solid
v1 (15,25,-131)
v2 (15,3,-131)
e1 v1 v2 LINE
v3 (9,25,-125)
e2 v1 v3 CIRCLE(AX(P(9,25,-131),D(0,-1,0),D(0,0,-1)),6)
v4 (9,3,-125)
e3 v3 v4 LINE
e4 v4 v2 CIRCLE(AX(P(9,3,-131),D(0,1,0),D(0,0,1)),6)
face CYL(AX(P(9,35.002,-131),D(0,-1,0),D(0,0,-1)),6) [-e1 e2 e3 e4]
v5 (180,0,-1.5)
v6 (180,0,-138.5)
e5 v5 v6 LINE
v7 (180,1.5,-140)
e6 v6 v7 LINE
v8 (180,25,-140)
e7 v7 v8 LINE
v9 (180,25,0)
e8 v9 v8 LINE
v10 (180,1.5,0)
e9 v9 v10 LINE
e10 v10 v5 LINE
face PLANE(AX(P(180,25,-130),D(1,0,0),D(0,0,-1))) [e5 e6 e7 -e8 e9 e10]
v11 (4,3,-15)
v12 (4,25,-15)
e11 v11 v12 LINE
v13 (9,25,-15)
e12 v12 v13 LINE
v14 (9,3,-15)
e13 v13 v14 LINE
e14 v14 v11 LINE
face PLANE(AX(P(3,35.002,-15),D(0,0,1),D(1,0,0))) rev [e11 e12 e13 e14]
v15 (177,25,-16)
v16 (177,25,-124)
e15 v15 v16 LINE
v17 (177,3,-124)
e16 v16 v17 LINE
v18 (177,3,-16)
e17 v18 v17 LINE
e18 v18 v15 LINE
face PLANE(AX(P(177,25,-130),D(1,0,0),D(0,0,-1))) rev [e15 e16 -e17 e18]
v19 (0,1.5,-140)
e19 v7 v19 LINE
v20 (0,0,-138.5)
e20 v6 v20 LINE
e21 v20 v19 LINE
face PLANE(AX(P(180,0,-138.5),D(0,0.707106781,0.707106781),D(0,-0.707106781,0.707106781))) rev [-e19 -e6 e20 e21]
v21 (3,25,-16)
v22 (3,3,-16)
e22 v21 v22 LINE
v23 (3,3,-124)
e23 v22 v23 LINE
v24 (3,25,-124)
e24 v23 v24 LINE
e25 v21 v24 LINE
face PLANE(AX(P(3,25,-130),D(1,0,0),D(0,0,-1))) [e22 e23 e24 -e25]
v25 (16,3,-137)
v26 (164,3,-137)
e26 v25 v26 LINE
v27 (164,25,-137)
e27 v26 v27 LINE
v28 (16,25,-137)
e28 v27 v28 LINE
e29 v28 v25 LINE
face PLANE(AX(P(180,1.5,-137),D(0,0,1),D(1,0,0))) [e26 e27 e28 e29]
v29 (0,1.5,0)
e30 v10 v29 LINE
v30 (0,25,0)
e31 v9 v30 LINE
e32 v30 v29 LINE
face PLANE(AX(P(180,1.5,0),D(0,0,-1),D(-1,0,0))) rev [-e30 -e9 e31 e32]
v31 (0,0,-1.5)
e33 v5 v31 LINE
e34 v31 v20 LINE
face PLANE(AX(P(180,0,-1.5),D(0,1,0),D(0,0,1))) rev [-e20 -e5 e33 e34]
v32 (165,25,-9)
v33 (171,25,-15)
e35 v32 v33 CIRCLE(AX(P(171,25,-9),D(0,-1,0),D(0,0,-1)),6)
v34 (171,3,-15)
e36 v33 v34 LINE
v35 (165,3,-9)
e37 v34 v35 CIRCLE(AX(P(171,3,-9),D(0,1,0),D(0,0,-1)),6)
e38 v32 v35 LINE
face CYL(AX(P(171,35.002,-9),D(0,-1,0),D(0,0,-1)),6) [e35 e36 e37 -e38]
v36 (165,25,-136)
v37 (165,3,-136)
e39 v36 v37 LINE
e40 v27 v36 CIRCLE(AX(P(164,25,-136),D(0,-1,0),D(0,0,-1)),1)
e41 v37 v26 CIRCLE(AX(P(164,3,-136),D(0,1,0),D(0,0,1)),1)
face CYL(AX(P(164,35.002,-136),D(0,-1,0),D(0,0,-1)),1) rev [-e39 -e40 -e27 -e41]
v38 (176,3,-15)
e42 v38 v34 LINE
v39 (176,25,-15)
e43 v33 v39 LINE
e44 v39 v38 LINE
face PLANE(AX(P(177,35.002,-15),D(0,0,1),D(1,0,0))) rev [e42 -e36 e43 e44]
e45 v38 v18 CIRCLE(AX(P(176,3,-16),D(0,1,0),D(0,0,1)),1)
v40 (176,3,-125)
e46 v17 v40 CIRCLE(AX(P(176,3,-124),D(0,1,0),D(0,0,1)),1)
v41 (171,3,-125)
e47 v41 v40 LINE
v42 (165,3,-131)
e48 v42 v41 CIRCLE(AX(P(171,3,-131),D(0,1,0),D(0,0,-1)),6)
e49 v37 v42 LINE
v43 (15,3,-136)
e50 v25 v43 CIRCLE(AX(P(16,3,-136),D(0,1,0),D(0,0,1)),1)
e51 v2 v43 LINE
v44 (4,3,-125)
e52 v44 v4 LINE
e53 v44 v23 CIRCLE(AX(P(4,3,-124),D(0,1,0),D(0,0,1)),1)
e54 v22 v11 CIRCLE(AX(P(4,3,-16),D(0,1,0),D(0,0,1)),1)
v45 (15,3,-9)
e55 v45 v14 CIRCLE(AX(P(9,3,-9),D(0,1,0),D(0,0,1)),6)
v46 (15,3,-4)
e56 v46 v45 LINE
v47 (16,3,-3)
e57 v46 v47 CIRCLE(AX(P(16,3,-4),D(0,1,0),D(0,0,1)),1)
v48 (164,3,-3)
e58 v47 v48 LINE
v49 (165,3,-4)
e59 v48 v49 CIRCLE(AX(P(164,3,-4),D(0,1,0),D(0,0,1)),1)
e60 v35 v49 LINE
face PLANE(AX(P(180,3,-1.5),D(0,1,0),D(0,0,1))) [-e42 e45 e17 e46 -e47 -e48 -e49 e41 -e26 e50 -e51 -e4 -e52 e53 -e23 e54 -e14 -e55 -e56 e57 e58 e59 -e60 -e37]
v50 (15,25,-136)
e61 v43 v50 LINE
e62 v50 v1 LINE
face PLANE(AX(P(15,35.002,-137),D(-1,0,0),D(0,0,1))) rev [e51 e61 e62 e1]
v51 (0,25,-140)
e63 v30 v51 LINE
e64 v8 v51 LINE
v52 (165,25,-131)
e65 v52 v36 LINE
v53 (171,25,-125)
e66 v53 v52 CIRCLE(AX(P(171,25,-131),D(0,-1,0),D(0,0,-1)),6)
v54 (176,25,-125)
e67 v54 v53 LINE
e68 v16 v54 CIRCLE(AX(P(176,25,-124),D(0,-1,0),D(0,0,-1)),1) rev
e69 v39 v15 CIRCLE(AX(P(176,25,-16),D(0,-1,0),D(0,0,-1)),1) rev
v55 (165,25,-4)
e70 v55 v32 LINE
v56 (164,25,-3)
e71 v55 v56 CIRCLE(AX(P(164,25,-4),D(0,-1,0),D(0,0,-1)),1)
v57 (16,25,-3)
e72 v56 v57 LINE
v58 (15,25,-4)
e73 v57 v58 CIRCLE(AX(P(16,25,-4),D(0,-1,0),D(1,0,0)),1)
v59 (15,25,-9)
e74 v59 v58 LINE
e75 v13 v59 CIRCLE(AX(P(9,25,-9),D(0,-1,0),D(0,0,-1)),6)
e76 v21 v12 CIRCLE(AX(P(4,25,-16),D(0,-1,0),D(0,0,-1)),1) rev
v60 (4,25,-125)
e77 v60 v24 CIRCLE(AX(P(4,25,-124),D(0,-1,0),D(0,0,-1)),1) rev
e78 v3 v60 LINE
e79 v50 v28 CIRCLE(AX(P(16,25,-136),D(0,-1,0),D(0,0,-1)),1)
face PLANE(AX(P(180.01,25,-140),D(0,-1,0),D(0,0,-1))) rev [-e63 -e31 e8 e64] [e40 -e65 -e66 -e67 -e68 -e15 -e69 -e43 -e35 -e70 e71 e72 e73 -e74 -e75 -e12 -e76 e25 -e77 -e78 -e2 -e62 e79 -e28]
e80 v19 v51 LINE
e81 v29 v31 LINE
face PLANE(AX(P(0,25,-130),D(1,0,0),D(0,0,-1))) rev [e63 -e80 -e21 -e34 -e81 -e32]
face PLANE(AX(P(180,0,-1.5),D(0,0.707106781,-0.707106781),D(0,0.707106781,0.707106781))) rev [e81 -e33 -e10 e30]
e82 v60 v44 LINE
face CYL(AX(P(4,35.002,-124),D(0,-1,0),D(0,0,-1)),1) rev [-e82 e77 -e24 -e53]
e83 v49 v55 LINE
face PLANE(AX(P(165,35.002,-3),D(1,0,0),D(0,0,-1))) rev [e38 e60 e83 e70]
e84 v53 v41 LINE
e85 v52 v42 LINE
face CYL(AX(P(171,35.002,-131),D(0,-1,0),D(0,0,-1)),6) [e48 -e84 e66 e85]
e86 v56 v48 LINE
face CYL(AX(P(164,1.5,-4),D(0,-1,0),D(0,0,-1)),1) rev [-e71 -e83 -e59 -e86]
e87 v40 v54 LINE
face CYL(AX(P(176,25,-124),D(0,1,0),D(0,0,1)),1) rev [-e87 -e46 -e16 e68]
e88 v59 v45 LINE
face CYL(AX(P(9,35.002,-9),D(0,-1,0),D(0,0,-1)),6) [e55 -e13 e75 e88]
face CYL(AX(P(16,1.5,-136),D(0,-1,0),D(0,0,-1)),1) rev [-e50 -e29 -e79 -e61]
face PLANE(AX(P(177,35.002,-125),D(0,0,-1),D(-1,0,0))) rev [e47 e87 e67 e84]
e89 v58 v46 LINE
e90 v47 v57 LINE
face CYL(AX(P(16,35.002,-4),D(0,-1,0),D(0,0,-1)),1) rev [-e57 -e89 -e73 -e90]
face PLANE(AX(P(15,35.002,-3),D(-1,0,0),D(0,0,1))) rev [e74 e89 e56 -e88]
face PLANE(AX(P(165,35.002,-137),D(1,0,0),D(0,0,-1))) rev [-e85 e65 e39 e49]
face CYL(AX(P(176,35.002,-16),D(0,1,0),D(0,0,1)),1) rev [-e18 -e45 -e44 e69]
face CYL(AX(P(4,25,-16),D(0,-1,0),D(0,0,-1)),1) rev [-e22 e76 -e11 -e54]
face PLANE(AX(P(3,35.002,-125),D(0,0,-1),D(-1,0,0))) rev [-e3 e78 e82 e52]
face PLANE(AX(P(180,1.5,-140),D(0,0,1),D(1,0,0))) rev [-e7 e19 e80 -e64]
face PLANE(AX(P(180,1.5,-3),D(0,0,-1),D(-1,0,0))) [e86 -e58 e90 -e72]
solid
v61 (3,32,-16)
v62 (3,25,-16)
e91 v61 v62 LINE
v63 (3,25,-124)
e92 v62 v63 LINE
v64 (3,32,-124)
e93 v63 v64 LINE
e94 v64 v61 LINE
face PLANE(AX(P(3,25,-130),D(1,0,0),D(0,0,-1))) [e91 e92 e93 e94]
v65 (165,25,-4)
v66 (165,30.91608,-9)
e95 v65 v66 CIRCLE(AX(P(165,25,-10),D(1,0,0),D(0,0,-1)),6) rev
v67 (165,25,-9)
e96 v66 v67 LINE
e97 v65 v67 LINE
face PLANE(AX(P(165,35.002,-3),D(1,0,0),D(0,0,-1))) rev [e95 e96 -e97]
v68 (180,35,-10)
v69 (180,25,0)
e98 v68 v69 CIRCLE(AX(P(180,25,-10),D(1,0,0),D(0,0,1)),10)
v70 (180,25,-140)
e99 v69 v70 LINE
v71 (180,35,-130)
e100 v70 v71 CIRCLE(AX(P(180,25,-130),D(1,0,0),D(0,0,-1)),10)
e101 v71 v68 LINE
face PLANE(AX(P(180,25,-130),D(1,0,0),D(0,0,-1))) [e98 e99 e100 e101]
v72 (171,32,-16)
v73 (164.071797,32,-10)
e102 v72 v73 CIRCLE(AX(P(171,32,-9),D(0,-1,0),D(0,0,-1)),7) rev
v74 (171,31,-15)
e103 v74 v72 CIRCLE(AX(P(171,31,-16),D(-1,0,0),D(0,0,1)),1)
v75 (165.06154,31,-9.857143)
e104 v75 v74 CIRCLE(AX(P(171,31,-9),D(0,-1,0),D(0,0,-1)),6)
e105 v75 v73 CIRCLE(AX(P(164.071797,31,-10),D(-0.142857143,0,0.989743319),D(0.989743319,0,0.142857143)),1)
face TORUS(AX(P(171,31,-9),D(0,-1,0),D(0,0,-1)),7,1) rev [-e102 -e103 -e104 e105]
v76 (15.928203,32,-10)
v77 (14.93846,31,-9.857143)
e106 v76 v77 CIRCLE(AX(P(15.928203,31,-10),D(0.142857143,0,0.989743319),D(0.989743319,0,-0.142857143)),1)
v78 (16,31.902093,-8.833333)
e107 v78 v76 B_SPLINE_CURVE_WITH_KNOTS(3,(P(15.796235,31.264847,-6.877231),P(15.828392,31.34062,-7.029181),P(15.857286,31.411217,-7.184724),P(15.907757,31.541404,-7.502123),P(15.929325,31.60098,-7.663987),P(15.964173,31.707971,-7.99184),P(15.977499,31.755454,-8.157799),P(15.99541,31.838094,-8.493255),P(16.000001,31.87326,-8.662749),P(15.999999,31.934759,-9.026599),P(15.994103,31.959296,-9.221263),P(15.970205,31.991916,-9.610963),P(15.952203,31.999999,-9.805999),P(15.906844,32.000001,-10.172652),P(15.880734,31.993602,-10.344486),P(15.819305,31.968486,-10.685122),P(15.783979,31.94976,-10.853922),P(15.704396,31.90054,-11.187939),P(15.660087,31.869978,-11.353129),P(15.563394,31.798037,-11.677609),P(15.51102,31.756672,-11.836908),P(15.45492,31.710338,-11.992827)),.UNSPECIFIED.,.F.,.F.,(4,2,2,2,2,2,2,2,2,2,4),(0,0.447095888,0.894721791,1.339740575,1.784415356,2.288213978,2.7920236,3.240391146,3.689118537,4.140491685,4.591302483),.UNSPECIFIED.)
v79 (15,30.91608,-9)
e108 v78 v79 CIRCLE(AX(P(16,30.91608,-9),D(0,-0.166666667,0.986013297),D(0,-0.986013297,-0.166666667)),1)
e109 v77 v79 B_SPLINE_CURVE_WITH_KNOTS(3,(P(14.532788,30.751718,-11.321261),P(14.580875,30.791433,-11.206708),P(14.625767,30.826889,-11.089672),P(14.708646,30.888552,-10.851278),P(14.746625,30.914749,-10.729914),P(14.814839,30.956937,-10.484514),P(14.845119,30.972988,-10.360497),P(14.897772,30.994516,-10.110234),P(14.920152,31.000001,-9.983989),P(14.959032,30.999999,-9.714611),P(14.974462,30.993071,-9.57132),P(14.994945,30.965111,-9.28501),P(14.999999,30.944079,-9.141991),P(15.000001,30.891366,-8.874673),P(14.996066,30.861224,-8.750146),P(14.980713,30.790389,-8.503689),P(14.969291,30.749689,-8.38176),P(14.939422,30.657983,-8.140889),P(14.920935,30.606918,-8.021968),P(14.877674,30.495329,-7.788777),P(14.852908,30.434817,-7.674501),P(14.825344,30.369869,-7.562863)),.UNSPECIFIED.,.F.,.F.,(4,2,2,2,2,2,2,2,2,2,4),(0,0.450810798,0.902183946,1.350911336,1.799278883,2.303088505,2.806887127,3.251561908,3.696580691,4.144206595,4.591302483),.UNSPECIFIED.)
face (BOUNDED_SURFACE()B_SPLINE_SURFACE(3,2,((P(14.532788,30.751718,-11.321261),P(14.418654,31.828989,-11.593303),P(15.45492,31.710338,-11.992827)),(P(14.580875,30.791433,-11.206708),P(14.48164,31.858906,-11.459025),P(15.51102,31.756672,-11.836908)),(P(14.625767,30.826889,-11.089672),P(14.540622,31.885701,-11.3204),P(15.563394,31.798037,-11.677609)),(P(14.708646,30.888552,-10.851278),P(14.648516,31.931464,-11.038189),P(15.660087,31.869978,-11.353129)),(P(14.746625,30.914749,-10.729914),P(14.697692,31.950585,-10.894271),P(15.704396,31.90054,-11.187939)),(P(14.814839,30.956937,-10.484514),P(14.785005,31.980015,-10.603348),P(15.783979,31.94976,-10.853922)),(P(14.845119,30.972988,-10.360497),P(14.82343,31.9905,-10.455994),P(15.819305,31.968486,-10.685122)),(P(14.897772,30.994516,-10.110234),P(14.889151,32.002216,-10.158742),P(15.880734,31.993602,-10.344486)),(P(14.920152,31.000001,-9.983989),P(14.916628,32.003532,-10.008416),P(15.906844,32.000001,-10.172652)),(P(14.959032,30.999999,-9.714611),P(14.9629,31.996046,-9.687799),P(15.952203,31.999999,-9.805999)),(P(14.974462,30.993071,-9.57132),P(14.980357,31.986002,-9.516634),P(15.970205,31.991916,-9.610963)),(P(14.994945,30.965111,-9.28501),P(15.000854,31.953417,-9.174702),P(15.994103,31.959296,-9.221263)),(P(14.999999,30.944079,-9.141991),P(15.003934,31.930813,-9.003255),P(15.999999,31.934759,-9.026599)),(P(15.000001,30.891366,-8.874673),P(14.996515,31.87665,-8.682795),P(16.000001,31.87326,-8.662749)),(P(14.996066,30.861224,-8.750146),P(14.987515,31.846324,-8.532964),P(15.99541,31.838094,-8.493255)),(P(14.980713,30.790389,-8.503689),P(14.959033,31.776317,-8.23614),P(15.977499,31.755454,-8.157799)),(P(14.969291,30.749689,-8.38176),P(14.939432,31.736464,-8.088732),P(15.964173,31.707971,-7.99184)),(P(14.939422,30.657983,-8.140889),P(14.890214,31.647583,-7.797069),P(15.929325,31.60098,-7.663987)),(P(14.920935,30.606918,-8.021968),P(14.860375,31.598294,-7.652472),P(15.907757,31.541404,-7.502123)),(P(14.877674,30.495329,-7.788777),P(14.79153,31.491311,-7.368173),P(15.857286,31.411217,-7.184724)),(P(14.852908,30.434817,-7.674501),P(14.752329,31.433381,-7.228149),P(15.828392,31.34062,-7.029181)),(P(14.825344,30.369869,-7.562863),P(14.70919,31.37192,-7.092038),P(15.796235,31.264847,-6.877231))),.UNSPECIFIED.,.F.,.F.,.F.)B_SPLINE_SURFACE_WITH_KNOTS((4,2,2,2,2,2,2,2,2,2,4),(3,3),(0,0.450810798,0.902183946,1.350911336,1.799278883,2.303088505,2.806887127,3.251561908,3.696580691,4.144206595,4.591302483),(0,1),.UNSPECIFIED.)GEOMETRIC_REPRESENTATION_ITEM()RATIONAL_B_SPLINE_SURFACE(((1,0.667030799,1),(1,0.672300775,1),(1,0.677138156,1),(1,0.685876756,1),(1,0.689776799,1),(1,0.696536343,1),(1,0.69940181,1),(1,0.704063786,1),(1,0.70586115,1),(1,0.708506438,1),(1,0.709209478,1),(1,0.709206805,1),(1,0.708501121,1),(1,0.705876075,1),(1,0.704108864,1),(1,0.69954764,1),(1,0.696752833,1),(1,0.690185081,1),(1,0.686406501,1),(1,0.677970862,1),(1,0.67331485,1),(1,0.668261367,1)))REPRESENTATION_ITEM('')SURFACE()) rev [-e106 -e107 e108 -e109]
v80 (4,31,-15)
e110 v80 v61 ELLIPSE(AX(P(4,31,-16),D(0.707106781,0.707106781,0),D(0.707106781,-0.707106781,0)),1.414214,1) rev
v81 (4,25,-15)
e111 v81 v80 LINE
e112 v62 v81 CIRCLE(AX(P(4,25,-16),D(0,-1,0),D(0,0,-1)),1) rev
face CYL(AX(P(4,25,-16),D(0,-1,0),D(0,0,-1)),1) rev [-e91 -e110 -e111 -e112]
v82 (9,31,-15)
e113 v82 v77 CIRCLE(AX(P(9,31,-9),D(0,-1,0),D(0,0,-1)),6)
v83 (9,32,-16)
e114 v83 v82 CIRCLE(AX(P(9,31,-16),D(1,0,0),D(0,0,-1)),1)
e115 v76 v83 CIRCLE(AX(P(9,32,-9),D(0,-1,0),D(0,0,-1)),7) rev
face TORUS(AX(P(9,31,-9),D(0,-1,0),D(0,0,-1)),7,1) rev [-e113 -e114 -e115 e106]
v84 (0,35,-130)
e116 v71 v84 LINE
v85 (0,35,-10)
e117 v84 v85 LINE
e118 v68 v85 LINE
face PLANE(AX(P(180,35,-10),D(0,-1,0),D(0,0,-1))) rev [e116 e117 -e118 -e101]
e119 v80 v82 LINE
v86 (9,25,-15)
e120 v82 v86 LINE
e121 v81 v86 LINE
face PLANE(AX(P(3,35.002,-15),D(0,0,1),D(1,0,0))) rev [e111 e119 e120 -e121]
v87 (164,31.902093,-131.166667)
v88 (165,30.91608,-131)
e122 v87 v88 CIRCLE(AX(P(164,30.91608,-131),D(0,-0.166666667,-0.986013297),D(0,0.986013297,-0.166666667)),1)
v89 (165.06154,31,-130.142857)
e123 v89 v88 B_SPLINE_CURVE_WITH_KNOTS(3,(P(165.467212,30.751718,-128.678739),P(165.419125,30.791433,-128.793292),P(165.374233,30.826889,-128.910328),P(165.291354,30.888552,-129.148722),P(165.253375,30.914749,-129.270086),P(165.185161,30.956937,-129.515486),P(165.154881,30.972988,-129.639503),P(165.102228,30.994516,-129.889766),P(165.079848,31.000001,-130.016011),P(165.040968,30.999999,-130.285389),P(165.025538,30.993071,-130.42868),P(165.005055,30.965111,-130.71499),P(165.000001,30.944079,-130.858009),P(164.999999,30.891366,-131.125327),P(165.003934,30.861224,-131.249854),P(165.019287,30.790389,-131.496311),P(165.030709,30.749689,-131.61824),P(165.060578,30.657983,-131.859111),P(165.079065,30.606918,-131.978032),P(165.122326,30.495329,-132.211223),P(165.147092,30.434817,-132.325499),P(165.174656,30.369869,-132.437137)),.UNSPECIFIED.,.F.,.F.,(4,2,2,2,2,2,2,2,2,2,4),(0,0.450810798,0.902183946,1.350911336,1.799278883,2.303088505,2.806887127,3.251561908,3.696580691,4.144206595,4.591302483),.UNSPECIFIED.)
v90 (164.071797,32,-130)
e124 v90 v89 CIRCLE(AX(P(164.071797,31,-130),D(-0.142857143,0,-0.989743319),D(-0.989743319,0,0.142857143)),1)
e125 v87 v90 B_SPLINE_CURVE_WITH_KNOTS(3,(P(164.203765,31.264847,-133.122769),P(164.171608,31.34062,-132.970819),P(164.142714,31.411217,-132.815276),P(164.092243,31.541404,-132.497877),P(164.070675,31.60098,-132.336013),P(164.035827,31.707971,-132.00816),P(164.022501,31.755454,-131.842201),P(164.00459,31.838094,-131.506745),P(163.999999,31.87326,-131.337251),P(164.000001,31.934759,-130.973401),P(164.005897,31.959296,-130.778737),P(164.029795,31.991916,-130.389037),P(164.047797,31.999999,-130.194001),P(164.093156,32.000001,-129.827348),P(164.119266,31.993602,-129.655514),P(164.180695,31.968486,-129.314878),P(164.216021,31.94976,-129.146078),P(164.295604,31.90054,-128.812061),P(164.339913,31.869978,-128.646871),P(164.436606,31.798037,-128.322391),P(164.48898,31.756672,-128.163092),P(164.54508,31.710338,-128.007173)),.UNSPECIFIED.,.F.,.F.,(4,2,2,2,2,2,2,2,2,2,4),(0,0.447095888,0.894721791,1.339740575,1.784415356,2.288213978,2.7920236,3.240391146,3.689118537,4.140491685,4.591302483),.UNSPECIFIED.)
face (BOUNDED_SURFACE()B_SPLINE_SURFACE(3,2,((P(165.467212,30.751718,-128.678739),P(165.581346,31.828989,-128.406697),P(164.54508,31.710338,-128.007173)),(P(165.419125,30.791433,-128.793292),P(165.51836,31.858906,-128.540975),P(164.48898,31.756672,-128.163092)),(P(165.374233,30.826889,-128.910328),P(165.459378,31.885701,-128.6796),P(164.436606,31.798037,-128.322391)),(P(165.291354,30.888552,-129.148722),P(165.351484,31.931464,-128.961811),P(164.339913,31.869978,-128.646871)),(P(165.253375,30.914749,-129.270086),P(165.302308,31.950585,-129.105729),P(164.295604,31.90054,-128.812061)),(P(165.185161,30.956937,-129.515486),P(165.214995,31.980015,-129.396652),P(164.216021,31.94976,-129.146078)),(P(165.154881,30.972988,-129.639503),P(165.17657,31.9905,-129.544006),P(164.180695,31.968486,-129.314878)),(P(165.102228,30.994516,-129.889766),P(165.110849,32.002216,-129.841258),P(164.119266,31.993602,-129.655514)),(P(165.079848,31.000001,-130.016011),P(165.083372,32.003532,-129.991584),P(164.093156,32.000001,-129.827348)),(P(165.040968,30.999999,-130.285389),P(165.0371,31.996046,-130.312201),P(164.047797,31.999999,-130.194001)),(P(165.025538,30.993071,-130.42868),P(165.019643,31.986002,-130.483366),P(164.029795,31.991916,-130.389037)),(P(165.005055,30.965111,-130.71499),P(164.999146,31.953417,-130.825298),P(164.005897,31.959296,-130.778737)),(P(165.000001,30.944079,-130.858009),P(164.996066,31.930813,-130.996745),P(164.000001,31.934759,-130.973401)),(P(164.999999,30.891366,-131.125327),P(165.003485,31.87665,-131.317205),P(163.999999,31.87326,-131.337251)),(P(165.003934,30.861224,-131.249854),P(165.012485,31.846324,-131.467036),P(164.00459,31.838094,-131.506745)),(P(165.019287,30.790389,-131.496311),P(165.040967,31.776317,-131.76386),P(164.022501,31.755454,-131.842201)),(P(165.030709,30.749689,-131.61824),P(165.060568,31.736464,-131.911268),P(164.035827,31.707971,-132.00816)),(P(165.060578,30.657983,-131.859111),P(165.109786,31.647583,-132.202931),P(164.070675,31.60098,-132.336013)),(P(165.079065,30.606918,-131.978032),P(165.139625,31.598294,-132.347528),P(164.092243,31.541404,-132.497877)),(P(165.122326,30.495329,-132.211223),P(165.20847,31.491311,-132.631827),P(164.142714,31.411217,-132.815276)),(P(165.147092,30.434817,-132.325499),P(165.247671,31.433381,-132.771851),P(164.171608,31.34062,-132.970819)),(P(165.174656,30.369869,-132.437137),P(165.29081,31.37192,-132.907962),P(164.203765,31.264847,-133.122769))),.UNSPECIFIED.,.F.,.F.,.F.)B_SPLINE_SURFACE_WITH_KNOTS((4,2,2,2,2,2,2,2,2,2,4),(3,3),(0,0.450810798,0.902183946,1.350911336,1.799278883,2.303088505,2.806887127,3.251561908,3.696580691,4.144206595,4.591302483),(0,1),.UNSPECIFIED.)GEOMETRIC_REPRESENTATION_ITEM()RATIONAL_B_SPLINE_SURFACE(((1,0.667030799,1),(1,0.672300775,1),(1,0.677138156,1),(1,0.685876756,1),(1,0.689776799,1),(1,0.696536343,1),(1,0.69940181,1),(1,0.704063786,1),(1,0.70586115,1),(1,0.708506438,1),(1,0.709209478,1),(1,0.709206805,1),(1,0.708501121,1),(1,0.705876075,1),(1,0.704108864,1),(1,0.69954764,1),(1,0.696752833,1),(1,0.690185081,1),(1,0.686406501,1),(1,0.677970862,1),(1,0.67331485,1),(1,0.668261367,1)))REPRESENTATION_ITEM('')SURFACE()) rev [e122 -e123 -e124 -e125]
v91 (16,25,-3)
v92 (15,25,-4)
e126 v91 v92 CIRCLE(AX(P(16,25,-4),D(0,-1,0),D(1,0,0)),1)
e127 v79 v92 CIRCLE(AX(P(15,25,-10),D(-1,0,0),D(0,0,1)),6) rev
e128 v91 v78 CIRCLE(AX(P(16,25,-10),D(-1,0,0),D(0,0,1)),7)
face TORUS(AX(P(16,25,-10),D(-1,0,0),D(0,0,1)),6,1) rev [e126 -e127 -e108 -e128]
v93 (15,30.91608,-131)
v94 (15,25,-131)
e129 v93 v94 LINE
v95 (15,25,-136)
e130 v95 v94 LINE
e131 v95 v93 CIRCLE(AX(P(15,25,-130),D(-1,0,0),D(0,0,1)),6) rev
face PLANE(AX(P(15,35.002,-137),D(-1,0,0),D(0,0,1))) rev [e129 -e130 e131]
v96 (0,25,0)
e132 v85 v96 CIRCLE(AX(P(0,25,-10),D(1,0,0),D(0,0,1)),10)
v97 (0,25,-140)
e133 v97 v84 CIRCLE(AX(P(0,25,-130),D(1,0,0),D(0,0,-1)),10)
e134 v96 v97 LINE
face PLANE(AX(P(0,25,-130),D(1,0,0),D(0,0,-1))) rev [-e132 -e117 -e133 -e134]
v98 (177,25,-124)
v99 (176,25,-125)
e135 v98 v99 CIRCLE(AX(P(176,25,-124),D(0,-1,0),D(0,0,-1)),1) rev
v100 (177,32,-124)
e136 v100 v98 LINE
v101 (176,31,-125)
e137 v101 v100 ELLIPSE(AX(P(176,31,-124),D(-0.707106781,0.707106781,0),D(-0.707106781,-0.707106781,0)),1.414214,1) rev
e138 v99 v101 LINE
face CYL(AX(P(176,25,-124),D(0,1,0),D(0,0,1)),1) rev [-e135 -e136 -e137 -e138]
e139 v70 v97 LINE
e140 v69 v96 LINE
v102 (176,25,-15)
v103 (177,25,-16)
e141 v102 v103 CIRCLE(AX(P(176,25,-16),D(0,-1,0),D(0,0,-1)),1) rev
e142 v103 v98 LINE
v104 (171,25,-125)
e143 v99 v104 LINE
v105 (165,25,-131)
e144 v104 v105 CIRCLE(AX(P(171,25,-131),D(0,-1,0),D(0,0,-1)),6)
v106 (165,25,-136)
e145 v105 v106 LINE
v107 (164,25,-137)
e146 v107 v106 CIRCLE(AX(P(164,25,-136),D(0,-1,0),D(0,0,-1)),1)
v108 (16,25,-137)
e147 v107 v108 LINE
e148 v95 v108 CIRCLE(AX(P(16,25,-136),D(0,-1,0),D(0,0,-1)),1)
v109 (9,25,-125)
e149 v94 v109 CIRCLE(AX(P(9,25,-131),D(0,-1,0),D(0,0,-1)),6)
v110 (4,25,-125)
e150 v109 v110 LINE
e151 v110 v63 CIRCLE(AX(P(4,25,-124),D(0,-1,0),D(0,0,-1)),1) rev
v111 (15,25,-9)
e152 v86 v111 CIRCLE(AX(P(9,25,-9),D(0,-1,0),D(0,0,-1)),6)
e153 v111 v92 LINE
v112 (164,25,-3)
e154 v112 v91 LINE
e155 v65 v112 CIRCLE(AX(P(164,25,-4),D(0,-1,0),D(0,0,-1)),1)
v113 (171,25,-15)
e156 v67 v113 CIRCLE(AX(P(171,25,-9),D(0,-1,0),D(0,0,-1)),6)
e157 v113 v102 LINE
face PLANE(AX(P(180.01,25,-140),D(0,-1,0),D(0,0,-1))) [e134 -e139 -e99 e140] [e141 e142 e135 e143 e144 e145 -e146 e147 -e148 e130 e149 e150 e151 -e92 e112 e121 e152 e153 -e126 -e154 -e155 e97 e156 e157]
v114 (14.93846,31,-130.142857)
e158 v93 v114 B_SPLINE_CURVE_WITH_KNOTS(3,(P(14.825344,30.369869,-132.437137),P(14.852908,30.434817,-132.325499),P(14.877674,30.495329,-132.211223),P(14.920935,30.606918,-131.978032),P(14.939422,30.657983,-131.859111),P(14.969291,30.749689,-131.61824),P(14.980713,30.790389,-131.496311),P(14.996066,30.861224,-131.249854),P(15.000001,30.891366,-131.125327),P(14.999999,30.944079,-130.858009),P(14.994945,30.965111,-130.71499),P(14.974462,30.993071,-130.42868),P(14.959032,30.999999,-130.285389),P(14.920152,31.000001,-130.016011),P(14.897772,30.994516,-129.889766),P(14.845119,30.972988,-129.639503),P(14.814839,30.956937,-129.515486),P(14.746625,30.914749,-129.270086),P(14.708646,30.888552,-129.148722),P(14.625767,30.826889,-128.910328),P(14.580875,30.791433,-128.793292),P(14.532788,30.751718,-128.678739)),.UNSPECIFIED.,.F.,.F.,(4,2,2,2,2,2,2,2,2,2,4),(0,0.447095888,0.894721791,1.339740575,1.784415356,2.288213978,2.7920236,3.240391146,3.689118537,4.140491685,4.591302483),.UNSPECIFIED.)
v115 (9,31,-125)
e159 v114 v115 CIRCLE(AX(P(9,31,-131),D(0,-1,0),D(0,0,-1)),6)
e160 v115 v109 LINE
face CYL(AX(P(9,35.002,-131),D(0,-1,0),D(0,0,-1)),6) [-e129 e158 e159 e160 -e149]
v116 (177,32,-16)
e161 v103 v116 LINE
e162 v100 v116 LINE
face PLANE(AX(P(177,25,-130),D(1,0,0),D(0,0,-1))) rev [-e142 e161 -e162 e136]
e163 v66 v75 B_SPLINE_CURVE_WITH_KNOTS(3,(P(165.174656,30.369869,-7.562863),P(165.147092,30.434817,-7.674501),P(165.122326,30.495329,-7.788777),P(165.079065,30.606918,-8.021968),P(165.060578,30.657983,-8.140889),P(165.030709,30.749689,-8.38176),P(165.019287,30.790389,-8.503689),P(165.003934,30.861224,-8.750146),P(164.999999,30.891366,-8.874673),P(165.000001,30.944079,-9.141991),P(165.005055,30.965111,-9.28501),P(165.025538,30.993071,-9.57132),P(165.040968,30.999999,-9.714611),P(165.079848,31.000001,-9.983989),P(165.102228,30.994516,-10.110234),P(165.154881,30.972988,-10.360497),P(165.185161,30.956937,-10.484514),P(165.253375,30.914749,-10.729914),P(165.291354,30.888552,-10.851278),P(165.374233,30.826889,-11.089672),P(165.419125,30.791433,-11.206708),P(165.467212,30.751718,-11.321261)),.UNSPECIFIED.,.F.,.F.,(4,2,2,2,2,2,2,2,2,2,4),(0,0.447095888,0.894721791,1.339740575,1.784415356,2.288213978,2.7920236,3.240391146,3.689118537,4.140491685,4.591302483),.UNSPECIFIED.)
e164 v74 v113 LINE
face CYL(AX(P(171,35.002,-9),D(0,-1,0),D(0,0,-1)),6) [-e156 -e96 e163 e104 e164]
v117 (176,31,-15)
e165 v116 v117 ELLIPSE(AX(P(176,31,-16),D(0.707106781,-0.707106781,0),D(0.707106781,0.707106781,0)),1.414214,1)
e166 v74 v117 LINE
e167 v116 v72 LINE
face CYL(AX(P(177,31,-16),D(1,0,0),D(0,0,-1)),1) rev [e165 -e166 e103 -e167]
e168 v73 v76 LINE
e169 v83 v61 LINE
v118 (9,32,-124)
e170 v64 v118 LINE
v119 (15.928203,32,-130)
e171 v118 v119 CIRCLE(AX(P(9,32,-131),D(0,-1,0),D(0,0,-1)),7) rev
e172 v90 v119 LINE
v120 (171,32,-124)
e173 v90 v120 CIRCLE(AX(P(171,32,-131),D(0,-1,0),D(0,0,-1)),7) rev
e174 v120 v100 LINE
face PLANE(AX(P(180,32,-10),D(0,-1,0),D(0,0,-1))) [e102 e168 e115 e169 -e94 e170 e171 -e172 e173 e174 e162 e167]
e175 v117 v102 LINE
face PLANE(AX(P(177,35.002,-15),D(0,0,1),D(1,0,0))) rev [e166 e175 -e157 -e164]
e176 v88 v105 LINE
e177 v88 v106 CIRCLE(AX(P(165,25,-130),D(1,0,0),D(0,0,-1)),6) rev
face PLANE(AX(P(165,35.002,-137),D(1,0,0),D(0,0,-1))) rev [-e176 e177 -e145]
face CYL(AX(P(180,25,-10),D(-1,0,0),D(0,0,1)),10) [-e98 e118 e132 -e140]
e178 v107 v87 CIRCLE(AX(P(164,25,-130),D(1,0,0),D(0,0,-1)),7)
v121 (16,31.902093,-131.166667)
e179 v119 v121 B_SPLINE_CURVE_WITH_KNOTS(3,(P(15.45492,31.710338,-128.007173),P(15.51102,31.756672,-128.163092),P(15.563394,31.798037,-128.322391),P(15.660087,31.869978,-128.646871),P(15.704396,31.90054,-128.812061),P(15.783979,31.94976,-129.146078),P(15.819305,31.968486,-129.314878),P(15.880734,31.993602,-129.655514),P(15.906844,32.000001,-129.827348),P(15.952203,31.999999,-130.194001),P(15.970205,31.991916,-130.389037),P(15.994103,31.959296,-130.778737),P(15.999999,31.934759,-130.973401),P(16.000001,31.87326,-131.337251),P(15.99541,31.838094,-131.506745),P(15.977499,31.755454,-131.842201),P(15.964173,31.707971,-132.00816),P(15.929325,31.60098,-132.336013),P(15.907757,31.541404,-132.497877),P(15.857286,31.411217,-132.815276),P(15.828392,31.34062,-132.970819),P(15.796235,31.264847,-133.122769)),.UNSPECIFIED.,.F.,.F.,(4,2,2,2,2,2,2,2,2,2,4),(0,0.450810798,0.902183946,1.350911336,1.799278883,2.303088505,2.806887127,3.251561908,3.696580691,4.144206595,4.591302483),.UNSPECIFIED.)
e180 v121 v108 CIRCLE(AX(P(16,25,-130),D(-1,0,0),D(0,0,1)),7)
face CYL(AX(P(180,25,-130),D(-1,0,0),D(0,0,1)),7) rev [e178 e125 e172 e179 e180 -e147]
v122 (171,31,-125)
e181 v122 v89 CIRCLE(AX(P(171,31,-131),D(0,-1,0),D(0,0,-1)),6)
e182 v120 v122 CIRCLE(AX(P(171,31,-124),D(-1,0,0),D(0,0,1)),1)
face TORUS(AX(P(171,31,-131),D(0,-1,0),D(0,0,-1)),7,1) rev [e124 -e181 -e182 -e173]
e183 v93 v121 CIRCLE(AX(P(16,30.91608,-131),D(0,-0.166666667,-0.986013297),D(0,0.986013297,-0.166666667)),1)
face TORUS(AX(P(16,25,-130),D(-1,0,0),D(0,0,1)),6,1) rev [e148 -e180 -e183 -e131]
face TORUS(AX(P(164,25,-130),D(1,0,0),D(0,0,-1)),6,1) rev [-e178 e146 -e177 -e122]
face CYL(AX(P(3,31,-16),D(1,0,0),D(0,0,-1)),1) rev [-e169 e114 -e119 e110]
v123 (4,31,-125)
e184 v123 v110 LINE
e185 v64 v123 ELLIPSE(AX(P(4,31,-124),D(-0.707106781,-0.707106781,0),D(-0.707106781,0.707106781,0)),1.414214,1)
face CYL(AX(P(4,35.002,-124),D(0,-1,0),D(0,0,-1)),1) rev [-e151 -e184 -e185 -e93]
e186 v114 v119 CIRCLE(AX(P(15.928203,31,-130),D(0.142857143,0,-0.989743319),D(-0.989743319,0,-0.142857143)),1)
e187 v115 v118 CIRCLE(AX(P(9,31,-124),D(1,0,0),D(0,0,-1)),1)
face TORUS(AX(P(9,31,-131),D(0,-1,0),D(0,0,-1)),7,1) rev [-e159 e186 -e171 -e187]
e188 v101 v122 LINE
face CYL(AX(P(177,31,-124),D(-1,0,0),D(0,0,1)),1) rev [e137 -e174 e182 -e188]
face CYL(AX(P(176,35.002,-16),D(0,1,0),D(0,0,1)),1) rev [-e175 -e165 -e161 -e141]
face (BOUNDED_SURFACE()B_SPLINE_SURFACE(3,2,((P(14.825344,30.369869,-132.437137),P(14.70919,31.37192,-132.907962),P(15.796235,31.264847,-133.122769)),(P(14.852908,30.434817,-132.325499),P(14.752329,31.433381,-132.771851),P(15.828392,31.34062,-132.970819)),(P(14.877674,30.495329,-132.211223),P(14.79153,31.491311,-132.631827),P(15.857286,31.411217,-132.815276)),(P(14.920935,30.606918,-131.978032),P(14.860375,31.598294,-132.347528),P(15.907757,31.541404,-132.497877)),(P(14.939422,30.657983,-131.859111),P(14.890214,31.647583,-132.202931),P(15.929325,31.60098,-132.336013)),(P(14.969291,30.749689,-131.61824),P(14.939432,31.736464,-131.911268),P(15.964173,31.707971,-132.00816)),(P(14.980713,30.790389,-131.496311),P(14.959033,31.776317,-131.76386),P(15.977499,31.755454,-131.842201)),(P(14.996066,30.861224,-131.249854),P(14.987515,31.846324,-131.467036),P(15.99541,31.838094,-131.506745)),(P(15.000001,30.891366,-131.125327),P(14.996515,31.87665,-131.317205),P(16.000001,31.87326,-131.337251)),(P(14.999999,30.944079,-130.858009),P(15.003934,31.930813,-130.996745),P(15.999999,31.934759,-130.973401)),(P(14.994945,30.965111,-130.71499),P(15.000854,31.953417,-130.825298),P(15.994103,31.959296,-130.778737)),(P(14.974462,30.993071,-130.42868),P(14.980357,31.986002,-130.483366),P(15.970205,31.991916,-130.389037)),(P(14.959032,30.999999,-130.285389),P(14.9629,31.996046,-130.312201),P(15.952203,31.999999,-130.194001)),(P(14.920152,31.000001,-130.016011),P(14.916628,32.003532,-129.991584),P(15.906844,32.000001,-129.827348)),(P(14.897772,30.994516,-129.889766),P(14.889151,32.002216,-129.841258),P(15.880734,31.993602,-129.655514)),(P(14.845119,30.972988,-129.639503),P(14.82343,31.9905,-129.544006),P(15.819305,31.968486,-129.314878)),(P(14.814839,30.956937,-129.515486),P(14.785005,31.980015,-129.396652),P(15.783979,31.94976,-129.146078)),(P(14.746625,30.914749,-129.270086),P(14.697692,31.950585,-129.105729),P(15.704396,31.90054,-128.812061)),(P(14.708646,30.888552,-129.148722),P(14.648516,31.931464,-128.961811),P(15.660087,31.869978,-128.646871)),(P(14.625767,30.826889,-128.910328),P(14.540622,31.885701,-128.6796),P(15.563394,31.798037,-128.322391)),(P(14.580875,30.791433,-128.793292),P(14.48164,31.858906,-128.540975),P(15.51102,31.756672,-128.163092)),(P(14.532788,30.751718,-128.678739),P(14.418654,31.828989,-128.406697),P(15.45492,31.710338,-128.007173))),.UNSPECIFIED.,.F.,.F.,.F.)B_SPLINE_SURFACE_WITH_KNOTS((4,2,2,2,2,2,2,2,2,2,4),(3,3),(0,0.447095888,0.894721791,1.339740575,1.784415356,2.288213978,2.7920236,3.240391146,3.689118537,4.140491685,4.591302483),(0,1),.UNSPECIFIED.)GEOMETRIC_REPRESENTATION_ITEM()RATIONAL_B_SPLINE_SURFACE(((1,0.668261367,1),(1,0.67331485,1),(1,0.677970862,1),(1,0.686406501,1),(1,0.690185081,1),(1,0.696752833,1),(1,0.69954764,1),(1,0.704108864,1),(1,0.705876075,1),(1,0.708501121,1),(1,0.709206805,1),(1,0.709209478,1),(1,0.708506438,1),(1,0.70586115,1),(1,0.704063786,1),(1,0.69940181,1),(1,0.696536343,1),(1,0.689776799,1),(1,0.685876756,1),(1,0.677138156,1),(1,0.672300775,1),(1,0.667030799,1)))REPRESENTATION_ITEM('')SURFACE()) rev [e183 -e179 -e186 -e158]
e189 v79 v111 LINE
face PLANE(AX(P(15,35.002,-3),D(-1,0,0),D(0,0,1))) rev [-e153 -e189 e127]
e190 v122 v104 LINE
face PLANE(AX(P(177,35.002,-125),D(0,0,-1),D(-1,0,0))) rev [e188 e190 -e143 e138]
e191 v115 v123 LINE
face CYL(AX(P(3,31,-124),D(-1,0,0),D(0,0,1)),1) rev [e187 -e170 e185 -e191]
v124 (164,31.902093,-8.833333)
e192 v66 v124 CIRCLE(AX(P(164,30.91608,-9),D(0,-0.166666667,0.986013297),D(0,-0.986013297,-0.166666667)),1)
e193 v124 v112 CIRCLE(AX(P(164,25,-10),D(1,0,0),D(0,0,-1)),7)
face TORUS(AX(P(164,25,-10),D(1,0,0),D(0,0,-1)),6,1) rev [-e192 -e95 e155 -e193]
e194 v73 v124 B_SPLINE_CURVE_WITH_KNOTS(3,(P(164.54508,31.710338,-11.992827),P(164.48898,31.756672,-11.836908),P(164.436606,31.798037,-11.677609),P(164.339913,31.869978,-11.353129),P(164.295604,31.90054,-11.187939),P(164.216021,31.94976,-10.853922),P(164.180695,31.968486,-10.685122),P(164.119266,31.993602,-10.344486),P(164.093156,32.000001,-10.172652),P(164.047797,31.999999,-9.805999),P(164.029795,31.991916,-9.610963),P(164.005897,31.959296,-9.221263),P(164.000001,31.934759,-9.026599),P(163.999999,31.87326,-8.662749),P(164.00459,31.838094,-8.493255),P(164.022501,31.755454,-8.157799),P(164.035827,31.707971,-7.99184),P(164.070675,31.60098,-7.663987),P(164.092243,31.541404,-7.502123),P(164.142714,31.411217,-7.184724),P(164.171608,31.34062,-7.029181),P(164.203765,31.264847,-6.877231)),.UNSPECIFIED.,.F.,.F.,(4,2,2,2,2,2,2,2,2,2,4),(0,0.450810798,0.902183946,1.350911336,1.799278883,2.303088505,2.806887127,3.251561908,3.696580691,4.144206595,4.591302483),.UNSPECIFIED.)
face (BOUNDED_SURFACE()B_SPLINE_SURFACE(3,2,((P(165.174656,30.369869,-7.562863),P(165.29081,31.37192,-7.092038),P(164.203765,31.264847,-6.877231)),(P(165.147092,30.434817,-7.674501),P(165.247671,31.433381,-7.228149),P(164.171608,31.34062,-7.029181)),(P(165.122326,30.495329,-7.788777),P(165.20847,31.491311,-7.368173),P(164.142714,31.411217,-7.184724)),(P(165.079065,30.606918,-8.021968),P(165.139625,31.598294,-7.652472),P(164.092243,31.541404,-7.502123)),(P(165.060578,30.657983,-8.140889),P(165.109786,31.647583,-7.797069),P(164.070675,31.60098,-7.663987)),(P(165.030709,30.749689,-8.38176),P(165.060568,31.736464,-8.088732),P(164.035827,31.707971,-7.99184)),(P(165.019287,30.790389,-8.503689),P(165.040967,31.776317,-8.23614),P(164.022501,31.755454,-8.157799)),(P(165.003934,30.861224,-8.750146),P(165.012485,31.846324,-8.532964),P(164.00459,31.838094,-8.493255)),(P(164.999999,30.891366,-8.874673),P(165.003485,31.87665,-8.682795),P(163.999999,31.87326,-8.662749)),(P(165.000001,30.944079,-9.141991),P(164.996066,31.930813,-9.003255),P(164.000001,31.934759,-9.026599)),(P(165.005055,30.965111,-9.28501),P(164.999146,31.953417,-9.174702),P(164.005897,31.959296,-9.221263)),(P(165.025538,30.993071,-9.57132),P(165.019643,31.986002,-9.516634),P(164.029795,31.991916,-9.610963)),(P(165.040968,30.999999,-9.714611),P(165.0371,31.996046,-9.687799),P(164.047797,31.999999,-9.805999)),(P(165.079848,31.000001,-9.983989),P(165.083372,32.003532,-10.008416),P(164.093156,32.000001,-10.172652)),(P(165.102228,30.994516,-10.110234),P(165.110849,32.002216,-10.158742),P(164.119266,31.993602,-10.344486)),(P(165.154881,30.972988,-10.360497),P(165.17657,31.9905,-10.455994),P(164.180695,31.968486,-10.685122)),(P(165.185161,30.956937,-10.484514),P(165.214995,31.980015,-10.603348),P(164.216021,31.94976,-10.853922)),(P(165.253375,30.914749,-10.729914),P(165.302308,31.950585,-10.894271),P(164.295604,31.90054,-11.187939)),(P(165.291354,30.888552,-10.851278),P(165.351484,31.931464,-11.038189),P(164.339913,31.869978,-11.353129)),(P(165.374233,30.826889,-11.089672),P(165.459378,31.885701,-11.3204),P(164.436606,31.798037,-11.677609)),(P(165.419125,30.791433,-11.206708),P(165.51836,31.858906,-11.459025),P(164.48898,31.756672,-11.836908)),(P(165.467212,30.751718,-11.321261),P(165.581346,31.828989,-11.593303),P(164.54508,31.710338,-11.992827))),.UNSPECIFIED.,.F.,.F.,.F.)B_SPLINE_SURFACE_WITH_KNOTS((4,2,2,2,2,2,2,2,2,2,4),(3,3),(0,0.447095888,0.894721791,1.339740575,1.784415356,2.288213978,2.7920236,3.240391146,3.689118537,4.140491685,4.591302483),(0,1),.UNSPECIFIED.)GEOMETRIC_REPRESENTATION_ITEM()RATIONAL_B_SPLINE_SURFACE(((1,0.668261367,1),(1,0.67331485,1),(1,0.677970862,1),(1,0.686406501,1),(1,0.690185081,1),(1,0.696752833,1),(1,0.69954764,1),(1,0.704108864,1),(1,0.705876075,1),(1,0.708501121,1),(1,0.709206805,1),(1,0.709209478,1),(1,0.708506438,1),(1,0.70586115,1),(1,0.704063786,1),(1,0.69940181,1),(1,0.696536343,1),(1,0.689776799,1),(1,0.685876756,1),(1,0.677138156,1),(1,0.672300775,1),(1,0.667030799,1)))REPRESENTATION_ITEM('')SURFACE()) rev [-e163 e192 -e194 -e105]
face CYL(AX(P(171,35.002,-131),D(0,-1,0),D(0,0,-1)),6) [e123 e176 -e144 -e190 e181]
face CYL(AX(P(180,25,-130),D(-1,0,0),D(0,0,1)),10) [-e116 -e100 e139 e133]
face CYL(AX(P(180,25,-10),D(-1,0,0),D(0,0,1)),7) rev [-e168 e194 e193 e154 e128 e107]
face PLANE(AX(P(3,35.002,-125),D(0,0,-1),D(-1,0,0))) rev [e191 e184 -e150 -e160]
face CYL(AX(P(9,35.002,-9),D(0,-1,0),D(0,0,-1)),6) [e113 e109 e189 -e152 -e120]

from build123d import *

# Parameters (mm, degrees)
CASEEXTRUDE_DEPTH      = 180
SHELL1_T               = 3
SCREWBOSSEXTRUDE_REACH = 232.269
INTERNALFILLET_R       = 1


# Read off the part's stored shape, not the designer's step: Split3
with BuildPart() as part:
    # Sketch1 → CaseExtrude (new body)
    with BuildSketch(Plane(origin=(0, 0, 0), x_dir=(0, 0, -1), z_dir=(1, 0, 0))):
        with BuildLine():
            Line((1.5, 0), (0, 1.5))
            Line((0, 1.5), (0, 25))
            ThreePointArc((0, 25), (2.928932188, 32.071067812), (10, 35))
            Line((10, 35), (130, 35))
            ThreePointArc((130, 35), (137.071067812, 32.071067812), (140, 25))
            Line((140, 25), (140, 1.5))
            Line((140, 1.5), (138.5, 0))
            Line((138.5, 0), (1.5, 0))
        make_face()
    extrude(amount=CASEEXTRUDE_DEPTH)

    # Shell1 (no face opened: a closed hollow body)
    add(offset(amount=-SHELL1_T, mode=Mode.PRIVATE), mode=Mode.SUBTRACT)

    # Sketch5 → ScrewBossExtrude (add, up to next)
    with BuildSketch(Plane(origin=(0, 3, 0), x_dir=(1, 0, 0), z_dir=(0, 1, 0)), mode=Mode.PRIVATE) as screwbossextrude_sk1:
        with BuildLine():
            Line((3, 137), (15, 137))
            Line((15, 137), (15, 131))
            ThreePointArc((15, 131), (13.242640687, 126.757359313), (9, 125))
            Line((9, 125), (3, 125))
            Line((3, 125), (3, 137))
        make_face()
    screwbossextrude_tool1 = extrude(screwbossextrude_sk1.sketch, amount=SCREWBOSSEXTRUDE_REACH, mode=Mode.PRIVATE) - part.part
    # Sketch5 → ScrewBossExtrude (add, up to next)
    with BuildSketch(Plane(origin=(0, 3, 0), x_dir=(1, 0, 0), z_dir=(0, 1, 0)), mode=Mode.PRIVATE) as screwbossextrude_sk2:
        with BuildLine():
            Line((3, 3), (15, 3))
            Line((15, 3), (15, 9))
            ThreePointArc((15, 9), (13.242640687, 13.242640687), (9, 15))
            Line((9, 15), (3, 15))
            Line((3, 15), (3, 3))
        make_face()
    screwbossextrude_tool2 = extrude(screwbossextrude_sk2.sketch, amount=SCREWBOSSEXTRUDE_REACH, mode=Mode.PRIVATE) - part.part
    # Sketch5 → ScrewBossExtrude (add, up to next)
    with BuildSketch(Plane(origin=(0, 3, 0), x_dir=(1, 0, 0), z_dir=(0, 1, 0)), mode=Mode.PRIVATE) as screwbossextrude_sk3:
        with BuildLine():
            Line((177, 3), (165, 3))
            Line((165, 3), (165, 9))
            ThreePointArc((165, 9), (166.757359313, 13.242640687), (171, 15))
            Line((171, 15), (177, 15))
            Line((177, 15), (177, 3))
        make_face()
    screwbossextrude_tool3 = extrude(screwbossextrude_sk3.sketch, amount=SCREWBOSSEXTRUDE_REACH, mode=Mode.PRIVATE) - part.part
    # Sketch5 → ScrewBossExtrude (add, up to next)
    with BuildSketch(Plane(origin=(0, 3, 0), x_dir=(1, 0, 0), z_dir=(0, 1, 0)), mode=Mode.PRIVATE) as screwbossextrude_sk4:
        with BuildLine():
            Line((177, 137), (165, 137))
            Line((165, 137), (165, 131))
            ThreePointArc((165, 131), (166.757359313, 126.757359313), (171, 125))
            Line((171, 125), (177, 125))
            Line((177, 125), (177, 137))
        make_face()
    screwbossextrude_tool4 = extrude(screwbossextrude_sk4.sketch, amount=SCREWBOSSEXTRUDE_REACH, mode=Mode.PRIVATE) - part.part
    add(screwbossextrude_tool1.solids().sort_by_distance((8.735827, 3, -131.264173))[0])
    add(screwbossextrude_tool2.solids().sort_by_distance((8.735827, 3, -8.735827))[0])
    add(screwbossextrude_tool3.solids().sort_by_distance((171.264173, 3, -8.735827))[0])
    add(screwbossextrude_tool4.solids().sort_by_distance((171.264173, 3, -131.264173))[0])

    # InternalFillet
    internalfillet_edges = [part.edges().sort_by_distance(p)[0] for p in [
        (177, 17.5, -125),
        (174, 32, -125),
        (167.127016654, 32, -126.417424305),
        (165.020908991, 31.982153697, -130.499529468),
        (165, 29.582575695, -135.291502622),
        (165, 14, -137),
        (165, 14, -3),
        (165, 29.582575695, -4.708497378),
        (165.020908991, 31.982153697, -9.500470532),
        (167.127016654, 32, -13.582575695),
        (174, 32, -15),
        (177, 17.5, -15),
        (3, 17.5, -15),
        (6, 32, -15),
        (12.872983346, 32, -13.582575695),
        (14.979091009, 31.982153697, -9.500470532),
        (15, 29.582575695, -4.708497378),
        (15, 14, -3),
        (15, 14, -137),
        (15, 29.582575695, -135.291502622),
        (14.979091009, 31.982153697, -130.499529468),
        (12.872983346, 32, -126.417424305),
        (6, 32, -125),
        (3, 17.5, -125),
    ]]
    fillet(internalfillet_edges, radius=INTERNALFILLET_R)


with BuildPart() as body_2:
    # Split3: the piece on the far side of the plane
    add(part.part)
    split(bisect_by=Plane(origin=(0, 25, 0), x_dir=(1, 0, 0), z_dir=(0, 1, 0)), keep=Keep.BOTTOM)


with BuildPart() as part_1:
    add(part.part)

    # Split3
    split(bisect_by=Plane(origin=(0, 25, 0), x_dir=(1, 0, 0), z_dir=(0, 1, 0)), keep=Keep.TOP)


solid = Compound([body_2.part, part_1.part])
